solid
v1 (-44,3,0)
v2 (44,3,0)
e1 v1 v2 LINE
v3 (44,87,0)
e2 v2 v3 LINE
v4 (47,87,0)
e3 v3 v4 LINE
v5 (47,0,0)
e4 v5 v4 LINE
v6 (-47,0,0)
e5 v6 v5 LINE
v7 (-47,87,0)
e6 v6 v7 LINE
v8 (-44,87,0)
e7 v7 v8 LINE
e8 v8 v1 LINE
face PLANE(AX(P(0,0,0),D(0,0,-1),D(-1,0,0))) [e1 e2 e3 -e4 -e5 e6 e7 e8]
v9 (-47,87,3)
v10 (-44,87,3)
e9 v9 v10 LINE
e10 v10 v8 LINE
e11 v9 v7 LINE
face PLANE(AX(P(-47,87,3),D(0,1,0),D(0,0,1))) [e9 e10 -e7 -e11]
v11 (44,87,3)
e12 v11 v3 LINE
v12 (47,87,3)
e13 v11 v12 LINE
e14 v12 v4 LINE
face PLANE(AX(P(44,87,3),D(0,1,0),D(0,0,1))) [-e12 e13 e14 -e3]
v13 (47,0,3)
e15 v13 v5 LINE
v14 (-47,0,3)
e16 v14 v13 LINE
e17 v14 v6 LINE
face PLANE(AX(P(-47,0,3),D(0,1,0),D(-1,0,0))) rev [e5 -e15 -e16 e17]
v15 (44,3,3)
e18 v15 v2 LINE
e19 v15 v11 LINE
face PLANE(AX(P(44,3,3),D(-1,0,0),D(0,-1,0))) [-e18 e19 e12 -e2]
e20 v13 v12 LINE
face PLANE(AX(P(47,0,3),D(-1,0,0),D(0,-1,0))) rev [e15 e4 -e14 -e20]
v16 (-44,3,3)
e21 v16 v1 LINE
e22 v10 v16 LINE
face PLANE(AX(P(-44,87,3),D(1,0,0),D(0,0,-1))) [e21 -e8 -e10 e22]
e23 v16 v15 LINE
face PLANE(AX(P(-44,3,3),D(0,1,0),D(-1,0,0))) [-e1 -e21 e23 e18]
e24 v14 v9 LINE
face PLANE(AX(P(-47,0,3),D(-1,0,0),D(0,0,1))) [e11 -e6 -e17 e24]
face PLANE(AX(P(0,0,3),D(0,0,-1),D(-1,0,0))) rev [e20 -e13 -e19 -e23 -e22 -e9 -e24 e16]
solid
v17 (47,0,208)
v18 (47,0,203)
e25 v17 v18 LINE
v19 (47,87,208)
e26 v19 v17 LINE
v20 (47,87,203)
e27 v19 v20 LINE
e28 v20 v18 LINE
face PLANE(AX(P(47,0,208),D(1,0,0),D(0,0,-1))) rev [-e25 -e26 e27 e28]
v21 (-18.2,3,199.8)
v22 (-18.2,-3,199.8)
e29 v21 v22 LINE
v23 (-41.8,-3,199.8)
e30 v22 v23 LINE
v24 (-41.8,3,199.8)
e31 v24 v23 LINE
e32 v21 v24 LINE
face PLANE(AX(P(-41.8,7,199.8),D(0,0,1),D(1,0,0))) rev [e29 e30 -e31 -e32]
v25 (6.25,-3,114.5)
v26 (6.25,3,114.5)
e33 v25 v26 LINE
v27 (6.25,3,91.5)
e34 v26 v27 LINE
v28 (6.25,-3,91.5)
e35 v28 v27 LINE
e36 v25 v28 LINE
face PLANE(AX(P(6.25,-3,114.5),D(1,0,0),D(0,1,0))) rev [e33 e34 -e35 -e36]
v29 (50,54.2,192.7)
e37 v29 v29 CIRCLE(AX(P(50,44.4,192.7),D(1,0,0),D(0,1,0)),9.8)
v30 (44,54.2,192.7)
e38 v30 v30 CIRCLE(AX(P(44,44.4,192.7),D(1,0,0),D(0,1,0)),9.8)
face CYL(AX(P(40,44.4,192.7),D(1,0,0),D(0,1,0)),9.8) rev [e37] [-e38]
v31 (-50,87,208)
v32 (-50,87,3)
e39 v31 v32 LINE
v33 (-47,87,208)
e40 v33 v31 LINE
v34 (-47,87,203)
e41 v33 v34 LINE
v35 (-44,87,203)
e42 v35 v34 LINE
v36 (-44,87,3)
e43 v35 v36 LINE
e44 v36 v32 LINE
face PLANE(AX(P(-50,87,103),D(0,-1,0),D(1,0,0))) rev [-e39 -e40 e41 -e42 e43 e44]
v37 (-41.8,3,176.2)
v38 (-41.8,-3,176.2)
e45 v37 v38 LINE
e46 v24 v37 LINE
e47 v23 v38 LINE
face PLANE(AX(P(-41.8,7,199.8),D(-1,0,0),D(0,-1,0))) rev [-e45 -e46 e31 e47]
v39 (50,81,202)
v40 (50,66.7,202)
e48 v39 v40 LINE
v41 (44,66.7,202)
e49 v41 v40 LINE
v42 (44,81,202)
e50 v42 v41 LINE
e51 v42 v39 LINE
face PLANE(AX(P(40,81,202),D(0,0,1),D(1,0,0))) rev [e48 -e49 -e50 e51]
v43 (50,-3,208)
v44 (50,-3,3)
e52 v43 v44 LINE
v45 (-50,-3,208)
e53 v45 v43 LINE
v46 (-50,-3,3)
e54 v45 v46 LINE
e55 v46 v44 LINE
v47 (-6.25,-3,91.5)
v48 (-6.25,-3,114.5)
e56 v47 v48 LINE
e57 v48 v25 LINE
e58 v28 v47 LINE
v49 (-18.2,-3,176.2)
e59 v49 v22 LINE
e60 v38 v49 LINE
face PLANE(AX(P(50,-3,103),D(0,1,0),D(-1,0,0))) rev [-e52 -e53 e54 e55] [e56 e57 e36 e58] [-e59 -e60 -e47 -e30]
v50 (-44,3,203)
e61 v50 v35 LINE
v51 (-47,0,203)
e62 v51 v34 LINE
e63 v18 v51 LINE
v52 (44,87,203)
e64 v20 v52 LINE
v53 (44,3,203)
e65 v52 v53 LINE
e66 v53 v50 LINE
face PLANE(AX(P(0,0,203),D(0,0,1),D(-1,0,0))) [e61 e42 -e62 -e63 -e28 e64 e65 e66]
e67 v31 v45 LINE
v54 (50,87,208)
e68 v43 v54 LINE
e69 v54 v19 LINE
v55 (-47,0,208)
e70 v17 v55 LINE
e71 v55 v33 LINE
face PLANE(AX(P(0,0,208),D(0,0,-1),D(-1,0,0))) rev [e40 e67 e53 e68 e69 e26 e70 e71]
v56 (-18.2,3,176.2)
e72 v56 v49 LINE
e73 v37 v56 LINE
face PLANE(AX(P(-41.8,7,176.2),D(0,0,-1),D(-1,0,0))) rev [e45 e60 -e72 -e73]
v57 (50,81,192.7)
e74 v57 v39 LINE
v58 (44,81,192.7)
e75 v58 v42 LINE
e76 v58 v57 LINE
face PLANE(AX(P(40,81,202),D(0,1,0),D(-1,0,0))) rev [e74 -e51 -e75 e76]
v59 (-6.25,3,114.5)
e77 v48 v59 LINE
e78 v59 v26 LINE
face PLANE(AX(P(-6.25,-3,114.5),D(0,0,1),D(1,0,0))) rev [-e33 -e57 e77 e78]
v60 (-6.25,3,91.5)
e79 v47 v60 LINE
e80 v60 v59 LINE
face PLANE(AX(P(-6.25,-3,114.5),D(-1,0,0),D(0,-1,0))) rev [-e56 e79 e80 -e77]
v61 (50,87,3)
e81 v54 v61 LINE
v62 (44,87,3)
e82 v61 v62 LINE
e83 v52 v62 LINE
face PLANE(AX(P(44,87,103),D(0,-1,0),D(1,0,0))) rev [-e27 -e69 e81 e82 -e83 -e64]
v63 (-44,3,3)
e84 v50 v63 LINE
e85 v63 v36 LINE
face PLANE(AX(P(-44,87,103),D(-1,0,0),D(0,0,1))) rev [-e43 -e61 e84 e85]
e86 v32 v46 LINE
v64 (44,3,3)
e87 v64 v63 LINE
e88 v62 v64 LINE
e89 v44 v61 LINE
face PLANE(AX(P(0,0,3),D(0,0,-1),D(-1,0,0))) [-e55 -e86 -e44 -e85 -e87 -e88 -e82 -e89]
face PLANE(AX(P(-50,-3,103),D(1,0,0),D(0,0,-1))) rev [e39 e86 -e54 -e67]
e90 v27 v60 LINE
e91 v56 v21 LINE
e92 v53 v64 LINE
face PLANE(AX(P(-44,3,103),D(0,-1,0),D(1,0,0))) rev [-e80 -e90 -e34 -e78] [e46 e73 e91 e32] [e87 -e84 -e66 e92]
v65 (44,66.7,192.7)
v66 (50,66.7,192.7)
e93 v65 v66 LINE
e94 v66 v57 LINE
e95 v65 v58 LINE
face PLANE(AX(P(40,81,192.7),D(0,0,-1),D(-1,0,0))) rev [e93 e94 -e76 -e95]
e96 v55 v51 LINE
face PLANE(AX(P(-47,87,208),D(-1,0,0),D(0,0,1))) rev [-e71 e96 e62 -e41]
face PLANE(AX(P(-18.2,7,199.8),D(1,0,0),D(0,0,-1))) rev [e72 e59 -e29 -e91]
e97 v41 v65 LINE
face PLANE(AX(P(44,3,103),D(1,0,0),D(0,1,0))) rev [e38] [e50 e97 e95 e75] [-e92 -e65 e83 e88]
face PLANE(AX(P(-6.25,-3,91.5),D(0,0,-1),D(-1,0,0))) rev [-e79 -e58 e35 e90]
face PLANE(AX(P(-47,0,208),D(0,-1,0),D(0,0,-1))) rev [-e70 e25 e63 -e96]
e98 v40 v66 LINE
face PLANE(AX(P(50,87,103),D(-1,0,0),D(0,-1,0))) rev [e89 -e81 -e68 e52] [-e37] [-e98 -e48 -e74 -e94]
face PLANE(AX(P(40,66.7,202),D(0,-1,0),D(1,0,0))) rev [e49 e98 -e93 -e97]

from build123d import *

# Parameters (mm, degrees)
SALIENTE_EXTRUIR1_DEPTH = 3
SALIENTE_EXTRUIR2_DEPTH = 100
SIMETR_A2_START         = -3
SIMETR_A2_OUTLINE_W     = 6
SIMETR_A2_OUTLINE_H     = 100
SIMETR_A2_DEPTH         = 90
SIMETR_A2_2_OUTLINE_W   = 88
SIMETR_A2_2_OUTLINE_H   = 100
SIMETR_A2_2_DEPTH       = 6
CROQUIS3_W              = 12.5
CROQUIS3_H              = 23
CORTAR_EXTRUIR1_DEPTH   = 6
CROQUIS5_W              = 23.6
CROQUIS5_H              = 23.6
CORTAR_EXTRUIR3_DEPTH   = 10
SALIENTE_EXTRUIR3_DEPTH = 5
CROQUIS7_R              = 9.8
CROQUIS7_W              = 9.3
CROQUIS7_H              = 14.3
CORTAR_EXTRUIR4_DEPTH   = 10


# Read off the part's stored shape, not the designer's step: Simetría2
with BuildPart() as part:
    # Croquis1 → Saliente-Extruir1 (new body)
    with BuildSketch(Plane.XY):
        Polygon((-47, 0), (47, 0), (47, 87), (44, 87), (44, 3), (-44, 3), (-44, 87), (-47, 87), align=None)
    extrude(amount=SALIENTE_EXTRUIR1_DEPTH)


with BuildPart() as body_2:
    # Croquis2 → Saliente-Extruir2 (new body)
    with BuildSketch(Plane.XY.offset(3)):
        Polygon((-44, 87), (-44, 3), (44, 3), (44, 87), (50, 87), (50, -3), (-50, -3), (-50, 87), align=None)
    extrude(amount=SALIENTE_EXTRUIR2_DEPTH)

    # Simetría2 outline → Simetría2 (add)
    with BuildSketch(Plane(origin=(0, 0, 0), x_dir=(1, 0, 0), z_dir=(0, 1, 0)).offset(SIMETR_A2_START)):
        with Locations((-47, -153)):
            Rectangle(SIMETR_A2_OUTLINE_W, SIMETR_A2_OUTLINE_H)
        with Locations((47, -153)):
            Rectangle(SIMETR_A2_OUTLINE_W, SIMETR_A2_OUTLINE_H)
    extrude(amount=SIMETR_A2_DEPTH)

    # Simetr_a2 2 outline → Simetr_a2 2 (add)
    with BuildSketch(Plane(origin=(0, 0, 0), x_dir=(1, 0, 0), z_dir=(0, 1, 0)).offset(SIMETR_A2_START)):
        with Locations((0, -153)):
            Rectangle(SIMETR_A2_2_OUTLINE_W, SIMETR_A2_2_OUTLINE_H)
    extrude(amount=SIMETR_A2_2_DEPTH)

    # Croquis3 → Cortar-Extruir1 (cut)
    with BuildSketch(Plane(origin=(0, 3, 0), x_dir=(1, 0, 0), z_dir=(0, 1, 0))):
        with Locations((0, -103)):
            Rectangle(CROQUIS3_W, CROQUIS3_H)
    extrude(amount=-CORTAR_EXTRUIR1_DEPTH, mode=Mode.SUBTRACT)

    # Croquis5 → Cortar-Extruir3 (cut)
    with BuildSketch(Plane.XZ.offset(3)):
        with Locations((-30, 188)):
            Rectangle(CROQUIS5_W, CROQUIS5_H)
    extrude(amount=-CORTAR_EXTRUIR3_DEPTH, mode=Mode.SUBTRACT)

    # Croquis6 → Saliente-Extruir3 (add)
    with BuildSketch(Plane.XY.offset(203)):
        Polygon((-50, 87), (-47, 87), (-47, 0), (47, 0), (47, 87), (50, 87), (50, -3), (-50, -3), align=None)
    extrude(amount=SALIENTE_EXTRUIR3_DEPTH)

    # Croquis7 → Cortar-Extruir4 (cut)
    with BuildSketch(Plane(origin=(50, 0, 0), x_dir=(0, 0, -1), z_dir=(1, 0, 0))):
        with Locations(Location((-192.7, 44.4, 0), (0, 0, 90))):
            Circle(CROQUIS7_R)
        with Locations((-197.35, 73.85)):
            Rectangle(CROQUIS7_W, CROQUIS7_H)
    extrude(amount=-CORTAR_EXTRUIR4_DEPTH, mode=Mode.SUBTRACT)


solid = Compound([part.part, body_2.part])
